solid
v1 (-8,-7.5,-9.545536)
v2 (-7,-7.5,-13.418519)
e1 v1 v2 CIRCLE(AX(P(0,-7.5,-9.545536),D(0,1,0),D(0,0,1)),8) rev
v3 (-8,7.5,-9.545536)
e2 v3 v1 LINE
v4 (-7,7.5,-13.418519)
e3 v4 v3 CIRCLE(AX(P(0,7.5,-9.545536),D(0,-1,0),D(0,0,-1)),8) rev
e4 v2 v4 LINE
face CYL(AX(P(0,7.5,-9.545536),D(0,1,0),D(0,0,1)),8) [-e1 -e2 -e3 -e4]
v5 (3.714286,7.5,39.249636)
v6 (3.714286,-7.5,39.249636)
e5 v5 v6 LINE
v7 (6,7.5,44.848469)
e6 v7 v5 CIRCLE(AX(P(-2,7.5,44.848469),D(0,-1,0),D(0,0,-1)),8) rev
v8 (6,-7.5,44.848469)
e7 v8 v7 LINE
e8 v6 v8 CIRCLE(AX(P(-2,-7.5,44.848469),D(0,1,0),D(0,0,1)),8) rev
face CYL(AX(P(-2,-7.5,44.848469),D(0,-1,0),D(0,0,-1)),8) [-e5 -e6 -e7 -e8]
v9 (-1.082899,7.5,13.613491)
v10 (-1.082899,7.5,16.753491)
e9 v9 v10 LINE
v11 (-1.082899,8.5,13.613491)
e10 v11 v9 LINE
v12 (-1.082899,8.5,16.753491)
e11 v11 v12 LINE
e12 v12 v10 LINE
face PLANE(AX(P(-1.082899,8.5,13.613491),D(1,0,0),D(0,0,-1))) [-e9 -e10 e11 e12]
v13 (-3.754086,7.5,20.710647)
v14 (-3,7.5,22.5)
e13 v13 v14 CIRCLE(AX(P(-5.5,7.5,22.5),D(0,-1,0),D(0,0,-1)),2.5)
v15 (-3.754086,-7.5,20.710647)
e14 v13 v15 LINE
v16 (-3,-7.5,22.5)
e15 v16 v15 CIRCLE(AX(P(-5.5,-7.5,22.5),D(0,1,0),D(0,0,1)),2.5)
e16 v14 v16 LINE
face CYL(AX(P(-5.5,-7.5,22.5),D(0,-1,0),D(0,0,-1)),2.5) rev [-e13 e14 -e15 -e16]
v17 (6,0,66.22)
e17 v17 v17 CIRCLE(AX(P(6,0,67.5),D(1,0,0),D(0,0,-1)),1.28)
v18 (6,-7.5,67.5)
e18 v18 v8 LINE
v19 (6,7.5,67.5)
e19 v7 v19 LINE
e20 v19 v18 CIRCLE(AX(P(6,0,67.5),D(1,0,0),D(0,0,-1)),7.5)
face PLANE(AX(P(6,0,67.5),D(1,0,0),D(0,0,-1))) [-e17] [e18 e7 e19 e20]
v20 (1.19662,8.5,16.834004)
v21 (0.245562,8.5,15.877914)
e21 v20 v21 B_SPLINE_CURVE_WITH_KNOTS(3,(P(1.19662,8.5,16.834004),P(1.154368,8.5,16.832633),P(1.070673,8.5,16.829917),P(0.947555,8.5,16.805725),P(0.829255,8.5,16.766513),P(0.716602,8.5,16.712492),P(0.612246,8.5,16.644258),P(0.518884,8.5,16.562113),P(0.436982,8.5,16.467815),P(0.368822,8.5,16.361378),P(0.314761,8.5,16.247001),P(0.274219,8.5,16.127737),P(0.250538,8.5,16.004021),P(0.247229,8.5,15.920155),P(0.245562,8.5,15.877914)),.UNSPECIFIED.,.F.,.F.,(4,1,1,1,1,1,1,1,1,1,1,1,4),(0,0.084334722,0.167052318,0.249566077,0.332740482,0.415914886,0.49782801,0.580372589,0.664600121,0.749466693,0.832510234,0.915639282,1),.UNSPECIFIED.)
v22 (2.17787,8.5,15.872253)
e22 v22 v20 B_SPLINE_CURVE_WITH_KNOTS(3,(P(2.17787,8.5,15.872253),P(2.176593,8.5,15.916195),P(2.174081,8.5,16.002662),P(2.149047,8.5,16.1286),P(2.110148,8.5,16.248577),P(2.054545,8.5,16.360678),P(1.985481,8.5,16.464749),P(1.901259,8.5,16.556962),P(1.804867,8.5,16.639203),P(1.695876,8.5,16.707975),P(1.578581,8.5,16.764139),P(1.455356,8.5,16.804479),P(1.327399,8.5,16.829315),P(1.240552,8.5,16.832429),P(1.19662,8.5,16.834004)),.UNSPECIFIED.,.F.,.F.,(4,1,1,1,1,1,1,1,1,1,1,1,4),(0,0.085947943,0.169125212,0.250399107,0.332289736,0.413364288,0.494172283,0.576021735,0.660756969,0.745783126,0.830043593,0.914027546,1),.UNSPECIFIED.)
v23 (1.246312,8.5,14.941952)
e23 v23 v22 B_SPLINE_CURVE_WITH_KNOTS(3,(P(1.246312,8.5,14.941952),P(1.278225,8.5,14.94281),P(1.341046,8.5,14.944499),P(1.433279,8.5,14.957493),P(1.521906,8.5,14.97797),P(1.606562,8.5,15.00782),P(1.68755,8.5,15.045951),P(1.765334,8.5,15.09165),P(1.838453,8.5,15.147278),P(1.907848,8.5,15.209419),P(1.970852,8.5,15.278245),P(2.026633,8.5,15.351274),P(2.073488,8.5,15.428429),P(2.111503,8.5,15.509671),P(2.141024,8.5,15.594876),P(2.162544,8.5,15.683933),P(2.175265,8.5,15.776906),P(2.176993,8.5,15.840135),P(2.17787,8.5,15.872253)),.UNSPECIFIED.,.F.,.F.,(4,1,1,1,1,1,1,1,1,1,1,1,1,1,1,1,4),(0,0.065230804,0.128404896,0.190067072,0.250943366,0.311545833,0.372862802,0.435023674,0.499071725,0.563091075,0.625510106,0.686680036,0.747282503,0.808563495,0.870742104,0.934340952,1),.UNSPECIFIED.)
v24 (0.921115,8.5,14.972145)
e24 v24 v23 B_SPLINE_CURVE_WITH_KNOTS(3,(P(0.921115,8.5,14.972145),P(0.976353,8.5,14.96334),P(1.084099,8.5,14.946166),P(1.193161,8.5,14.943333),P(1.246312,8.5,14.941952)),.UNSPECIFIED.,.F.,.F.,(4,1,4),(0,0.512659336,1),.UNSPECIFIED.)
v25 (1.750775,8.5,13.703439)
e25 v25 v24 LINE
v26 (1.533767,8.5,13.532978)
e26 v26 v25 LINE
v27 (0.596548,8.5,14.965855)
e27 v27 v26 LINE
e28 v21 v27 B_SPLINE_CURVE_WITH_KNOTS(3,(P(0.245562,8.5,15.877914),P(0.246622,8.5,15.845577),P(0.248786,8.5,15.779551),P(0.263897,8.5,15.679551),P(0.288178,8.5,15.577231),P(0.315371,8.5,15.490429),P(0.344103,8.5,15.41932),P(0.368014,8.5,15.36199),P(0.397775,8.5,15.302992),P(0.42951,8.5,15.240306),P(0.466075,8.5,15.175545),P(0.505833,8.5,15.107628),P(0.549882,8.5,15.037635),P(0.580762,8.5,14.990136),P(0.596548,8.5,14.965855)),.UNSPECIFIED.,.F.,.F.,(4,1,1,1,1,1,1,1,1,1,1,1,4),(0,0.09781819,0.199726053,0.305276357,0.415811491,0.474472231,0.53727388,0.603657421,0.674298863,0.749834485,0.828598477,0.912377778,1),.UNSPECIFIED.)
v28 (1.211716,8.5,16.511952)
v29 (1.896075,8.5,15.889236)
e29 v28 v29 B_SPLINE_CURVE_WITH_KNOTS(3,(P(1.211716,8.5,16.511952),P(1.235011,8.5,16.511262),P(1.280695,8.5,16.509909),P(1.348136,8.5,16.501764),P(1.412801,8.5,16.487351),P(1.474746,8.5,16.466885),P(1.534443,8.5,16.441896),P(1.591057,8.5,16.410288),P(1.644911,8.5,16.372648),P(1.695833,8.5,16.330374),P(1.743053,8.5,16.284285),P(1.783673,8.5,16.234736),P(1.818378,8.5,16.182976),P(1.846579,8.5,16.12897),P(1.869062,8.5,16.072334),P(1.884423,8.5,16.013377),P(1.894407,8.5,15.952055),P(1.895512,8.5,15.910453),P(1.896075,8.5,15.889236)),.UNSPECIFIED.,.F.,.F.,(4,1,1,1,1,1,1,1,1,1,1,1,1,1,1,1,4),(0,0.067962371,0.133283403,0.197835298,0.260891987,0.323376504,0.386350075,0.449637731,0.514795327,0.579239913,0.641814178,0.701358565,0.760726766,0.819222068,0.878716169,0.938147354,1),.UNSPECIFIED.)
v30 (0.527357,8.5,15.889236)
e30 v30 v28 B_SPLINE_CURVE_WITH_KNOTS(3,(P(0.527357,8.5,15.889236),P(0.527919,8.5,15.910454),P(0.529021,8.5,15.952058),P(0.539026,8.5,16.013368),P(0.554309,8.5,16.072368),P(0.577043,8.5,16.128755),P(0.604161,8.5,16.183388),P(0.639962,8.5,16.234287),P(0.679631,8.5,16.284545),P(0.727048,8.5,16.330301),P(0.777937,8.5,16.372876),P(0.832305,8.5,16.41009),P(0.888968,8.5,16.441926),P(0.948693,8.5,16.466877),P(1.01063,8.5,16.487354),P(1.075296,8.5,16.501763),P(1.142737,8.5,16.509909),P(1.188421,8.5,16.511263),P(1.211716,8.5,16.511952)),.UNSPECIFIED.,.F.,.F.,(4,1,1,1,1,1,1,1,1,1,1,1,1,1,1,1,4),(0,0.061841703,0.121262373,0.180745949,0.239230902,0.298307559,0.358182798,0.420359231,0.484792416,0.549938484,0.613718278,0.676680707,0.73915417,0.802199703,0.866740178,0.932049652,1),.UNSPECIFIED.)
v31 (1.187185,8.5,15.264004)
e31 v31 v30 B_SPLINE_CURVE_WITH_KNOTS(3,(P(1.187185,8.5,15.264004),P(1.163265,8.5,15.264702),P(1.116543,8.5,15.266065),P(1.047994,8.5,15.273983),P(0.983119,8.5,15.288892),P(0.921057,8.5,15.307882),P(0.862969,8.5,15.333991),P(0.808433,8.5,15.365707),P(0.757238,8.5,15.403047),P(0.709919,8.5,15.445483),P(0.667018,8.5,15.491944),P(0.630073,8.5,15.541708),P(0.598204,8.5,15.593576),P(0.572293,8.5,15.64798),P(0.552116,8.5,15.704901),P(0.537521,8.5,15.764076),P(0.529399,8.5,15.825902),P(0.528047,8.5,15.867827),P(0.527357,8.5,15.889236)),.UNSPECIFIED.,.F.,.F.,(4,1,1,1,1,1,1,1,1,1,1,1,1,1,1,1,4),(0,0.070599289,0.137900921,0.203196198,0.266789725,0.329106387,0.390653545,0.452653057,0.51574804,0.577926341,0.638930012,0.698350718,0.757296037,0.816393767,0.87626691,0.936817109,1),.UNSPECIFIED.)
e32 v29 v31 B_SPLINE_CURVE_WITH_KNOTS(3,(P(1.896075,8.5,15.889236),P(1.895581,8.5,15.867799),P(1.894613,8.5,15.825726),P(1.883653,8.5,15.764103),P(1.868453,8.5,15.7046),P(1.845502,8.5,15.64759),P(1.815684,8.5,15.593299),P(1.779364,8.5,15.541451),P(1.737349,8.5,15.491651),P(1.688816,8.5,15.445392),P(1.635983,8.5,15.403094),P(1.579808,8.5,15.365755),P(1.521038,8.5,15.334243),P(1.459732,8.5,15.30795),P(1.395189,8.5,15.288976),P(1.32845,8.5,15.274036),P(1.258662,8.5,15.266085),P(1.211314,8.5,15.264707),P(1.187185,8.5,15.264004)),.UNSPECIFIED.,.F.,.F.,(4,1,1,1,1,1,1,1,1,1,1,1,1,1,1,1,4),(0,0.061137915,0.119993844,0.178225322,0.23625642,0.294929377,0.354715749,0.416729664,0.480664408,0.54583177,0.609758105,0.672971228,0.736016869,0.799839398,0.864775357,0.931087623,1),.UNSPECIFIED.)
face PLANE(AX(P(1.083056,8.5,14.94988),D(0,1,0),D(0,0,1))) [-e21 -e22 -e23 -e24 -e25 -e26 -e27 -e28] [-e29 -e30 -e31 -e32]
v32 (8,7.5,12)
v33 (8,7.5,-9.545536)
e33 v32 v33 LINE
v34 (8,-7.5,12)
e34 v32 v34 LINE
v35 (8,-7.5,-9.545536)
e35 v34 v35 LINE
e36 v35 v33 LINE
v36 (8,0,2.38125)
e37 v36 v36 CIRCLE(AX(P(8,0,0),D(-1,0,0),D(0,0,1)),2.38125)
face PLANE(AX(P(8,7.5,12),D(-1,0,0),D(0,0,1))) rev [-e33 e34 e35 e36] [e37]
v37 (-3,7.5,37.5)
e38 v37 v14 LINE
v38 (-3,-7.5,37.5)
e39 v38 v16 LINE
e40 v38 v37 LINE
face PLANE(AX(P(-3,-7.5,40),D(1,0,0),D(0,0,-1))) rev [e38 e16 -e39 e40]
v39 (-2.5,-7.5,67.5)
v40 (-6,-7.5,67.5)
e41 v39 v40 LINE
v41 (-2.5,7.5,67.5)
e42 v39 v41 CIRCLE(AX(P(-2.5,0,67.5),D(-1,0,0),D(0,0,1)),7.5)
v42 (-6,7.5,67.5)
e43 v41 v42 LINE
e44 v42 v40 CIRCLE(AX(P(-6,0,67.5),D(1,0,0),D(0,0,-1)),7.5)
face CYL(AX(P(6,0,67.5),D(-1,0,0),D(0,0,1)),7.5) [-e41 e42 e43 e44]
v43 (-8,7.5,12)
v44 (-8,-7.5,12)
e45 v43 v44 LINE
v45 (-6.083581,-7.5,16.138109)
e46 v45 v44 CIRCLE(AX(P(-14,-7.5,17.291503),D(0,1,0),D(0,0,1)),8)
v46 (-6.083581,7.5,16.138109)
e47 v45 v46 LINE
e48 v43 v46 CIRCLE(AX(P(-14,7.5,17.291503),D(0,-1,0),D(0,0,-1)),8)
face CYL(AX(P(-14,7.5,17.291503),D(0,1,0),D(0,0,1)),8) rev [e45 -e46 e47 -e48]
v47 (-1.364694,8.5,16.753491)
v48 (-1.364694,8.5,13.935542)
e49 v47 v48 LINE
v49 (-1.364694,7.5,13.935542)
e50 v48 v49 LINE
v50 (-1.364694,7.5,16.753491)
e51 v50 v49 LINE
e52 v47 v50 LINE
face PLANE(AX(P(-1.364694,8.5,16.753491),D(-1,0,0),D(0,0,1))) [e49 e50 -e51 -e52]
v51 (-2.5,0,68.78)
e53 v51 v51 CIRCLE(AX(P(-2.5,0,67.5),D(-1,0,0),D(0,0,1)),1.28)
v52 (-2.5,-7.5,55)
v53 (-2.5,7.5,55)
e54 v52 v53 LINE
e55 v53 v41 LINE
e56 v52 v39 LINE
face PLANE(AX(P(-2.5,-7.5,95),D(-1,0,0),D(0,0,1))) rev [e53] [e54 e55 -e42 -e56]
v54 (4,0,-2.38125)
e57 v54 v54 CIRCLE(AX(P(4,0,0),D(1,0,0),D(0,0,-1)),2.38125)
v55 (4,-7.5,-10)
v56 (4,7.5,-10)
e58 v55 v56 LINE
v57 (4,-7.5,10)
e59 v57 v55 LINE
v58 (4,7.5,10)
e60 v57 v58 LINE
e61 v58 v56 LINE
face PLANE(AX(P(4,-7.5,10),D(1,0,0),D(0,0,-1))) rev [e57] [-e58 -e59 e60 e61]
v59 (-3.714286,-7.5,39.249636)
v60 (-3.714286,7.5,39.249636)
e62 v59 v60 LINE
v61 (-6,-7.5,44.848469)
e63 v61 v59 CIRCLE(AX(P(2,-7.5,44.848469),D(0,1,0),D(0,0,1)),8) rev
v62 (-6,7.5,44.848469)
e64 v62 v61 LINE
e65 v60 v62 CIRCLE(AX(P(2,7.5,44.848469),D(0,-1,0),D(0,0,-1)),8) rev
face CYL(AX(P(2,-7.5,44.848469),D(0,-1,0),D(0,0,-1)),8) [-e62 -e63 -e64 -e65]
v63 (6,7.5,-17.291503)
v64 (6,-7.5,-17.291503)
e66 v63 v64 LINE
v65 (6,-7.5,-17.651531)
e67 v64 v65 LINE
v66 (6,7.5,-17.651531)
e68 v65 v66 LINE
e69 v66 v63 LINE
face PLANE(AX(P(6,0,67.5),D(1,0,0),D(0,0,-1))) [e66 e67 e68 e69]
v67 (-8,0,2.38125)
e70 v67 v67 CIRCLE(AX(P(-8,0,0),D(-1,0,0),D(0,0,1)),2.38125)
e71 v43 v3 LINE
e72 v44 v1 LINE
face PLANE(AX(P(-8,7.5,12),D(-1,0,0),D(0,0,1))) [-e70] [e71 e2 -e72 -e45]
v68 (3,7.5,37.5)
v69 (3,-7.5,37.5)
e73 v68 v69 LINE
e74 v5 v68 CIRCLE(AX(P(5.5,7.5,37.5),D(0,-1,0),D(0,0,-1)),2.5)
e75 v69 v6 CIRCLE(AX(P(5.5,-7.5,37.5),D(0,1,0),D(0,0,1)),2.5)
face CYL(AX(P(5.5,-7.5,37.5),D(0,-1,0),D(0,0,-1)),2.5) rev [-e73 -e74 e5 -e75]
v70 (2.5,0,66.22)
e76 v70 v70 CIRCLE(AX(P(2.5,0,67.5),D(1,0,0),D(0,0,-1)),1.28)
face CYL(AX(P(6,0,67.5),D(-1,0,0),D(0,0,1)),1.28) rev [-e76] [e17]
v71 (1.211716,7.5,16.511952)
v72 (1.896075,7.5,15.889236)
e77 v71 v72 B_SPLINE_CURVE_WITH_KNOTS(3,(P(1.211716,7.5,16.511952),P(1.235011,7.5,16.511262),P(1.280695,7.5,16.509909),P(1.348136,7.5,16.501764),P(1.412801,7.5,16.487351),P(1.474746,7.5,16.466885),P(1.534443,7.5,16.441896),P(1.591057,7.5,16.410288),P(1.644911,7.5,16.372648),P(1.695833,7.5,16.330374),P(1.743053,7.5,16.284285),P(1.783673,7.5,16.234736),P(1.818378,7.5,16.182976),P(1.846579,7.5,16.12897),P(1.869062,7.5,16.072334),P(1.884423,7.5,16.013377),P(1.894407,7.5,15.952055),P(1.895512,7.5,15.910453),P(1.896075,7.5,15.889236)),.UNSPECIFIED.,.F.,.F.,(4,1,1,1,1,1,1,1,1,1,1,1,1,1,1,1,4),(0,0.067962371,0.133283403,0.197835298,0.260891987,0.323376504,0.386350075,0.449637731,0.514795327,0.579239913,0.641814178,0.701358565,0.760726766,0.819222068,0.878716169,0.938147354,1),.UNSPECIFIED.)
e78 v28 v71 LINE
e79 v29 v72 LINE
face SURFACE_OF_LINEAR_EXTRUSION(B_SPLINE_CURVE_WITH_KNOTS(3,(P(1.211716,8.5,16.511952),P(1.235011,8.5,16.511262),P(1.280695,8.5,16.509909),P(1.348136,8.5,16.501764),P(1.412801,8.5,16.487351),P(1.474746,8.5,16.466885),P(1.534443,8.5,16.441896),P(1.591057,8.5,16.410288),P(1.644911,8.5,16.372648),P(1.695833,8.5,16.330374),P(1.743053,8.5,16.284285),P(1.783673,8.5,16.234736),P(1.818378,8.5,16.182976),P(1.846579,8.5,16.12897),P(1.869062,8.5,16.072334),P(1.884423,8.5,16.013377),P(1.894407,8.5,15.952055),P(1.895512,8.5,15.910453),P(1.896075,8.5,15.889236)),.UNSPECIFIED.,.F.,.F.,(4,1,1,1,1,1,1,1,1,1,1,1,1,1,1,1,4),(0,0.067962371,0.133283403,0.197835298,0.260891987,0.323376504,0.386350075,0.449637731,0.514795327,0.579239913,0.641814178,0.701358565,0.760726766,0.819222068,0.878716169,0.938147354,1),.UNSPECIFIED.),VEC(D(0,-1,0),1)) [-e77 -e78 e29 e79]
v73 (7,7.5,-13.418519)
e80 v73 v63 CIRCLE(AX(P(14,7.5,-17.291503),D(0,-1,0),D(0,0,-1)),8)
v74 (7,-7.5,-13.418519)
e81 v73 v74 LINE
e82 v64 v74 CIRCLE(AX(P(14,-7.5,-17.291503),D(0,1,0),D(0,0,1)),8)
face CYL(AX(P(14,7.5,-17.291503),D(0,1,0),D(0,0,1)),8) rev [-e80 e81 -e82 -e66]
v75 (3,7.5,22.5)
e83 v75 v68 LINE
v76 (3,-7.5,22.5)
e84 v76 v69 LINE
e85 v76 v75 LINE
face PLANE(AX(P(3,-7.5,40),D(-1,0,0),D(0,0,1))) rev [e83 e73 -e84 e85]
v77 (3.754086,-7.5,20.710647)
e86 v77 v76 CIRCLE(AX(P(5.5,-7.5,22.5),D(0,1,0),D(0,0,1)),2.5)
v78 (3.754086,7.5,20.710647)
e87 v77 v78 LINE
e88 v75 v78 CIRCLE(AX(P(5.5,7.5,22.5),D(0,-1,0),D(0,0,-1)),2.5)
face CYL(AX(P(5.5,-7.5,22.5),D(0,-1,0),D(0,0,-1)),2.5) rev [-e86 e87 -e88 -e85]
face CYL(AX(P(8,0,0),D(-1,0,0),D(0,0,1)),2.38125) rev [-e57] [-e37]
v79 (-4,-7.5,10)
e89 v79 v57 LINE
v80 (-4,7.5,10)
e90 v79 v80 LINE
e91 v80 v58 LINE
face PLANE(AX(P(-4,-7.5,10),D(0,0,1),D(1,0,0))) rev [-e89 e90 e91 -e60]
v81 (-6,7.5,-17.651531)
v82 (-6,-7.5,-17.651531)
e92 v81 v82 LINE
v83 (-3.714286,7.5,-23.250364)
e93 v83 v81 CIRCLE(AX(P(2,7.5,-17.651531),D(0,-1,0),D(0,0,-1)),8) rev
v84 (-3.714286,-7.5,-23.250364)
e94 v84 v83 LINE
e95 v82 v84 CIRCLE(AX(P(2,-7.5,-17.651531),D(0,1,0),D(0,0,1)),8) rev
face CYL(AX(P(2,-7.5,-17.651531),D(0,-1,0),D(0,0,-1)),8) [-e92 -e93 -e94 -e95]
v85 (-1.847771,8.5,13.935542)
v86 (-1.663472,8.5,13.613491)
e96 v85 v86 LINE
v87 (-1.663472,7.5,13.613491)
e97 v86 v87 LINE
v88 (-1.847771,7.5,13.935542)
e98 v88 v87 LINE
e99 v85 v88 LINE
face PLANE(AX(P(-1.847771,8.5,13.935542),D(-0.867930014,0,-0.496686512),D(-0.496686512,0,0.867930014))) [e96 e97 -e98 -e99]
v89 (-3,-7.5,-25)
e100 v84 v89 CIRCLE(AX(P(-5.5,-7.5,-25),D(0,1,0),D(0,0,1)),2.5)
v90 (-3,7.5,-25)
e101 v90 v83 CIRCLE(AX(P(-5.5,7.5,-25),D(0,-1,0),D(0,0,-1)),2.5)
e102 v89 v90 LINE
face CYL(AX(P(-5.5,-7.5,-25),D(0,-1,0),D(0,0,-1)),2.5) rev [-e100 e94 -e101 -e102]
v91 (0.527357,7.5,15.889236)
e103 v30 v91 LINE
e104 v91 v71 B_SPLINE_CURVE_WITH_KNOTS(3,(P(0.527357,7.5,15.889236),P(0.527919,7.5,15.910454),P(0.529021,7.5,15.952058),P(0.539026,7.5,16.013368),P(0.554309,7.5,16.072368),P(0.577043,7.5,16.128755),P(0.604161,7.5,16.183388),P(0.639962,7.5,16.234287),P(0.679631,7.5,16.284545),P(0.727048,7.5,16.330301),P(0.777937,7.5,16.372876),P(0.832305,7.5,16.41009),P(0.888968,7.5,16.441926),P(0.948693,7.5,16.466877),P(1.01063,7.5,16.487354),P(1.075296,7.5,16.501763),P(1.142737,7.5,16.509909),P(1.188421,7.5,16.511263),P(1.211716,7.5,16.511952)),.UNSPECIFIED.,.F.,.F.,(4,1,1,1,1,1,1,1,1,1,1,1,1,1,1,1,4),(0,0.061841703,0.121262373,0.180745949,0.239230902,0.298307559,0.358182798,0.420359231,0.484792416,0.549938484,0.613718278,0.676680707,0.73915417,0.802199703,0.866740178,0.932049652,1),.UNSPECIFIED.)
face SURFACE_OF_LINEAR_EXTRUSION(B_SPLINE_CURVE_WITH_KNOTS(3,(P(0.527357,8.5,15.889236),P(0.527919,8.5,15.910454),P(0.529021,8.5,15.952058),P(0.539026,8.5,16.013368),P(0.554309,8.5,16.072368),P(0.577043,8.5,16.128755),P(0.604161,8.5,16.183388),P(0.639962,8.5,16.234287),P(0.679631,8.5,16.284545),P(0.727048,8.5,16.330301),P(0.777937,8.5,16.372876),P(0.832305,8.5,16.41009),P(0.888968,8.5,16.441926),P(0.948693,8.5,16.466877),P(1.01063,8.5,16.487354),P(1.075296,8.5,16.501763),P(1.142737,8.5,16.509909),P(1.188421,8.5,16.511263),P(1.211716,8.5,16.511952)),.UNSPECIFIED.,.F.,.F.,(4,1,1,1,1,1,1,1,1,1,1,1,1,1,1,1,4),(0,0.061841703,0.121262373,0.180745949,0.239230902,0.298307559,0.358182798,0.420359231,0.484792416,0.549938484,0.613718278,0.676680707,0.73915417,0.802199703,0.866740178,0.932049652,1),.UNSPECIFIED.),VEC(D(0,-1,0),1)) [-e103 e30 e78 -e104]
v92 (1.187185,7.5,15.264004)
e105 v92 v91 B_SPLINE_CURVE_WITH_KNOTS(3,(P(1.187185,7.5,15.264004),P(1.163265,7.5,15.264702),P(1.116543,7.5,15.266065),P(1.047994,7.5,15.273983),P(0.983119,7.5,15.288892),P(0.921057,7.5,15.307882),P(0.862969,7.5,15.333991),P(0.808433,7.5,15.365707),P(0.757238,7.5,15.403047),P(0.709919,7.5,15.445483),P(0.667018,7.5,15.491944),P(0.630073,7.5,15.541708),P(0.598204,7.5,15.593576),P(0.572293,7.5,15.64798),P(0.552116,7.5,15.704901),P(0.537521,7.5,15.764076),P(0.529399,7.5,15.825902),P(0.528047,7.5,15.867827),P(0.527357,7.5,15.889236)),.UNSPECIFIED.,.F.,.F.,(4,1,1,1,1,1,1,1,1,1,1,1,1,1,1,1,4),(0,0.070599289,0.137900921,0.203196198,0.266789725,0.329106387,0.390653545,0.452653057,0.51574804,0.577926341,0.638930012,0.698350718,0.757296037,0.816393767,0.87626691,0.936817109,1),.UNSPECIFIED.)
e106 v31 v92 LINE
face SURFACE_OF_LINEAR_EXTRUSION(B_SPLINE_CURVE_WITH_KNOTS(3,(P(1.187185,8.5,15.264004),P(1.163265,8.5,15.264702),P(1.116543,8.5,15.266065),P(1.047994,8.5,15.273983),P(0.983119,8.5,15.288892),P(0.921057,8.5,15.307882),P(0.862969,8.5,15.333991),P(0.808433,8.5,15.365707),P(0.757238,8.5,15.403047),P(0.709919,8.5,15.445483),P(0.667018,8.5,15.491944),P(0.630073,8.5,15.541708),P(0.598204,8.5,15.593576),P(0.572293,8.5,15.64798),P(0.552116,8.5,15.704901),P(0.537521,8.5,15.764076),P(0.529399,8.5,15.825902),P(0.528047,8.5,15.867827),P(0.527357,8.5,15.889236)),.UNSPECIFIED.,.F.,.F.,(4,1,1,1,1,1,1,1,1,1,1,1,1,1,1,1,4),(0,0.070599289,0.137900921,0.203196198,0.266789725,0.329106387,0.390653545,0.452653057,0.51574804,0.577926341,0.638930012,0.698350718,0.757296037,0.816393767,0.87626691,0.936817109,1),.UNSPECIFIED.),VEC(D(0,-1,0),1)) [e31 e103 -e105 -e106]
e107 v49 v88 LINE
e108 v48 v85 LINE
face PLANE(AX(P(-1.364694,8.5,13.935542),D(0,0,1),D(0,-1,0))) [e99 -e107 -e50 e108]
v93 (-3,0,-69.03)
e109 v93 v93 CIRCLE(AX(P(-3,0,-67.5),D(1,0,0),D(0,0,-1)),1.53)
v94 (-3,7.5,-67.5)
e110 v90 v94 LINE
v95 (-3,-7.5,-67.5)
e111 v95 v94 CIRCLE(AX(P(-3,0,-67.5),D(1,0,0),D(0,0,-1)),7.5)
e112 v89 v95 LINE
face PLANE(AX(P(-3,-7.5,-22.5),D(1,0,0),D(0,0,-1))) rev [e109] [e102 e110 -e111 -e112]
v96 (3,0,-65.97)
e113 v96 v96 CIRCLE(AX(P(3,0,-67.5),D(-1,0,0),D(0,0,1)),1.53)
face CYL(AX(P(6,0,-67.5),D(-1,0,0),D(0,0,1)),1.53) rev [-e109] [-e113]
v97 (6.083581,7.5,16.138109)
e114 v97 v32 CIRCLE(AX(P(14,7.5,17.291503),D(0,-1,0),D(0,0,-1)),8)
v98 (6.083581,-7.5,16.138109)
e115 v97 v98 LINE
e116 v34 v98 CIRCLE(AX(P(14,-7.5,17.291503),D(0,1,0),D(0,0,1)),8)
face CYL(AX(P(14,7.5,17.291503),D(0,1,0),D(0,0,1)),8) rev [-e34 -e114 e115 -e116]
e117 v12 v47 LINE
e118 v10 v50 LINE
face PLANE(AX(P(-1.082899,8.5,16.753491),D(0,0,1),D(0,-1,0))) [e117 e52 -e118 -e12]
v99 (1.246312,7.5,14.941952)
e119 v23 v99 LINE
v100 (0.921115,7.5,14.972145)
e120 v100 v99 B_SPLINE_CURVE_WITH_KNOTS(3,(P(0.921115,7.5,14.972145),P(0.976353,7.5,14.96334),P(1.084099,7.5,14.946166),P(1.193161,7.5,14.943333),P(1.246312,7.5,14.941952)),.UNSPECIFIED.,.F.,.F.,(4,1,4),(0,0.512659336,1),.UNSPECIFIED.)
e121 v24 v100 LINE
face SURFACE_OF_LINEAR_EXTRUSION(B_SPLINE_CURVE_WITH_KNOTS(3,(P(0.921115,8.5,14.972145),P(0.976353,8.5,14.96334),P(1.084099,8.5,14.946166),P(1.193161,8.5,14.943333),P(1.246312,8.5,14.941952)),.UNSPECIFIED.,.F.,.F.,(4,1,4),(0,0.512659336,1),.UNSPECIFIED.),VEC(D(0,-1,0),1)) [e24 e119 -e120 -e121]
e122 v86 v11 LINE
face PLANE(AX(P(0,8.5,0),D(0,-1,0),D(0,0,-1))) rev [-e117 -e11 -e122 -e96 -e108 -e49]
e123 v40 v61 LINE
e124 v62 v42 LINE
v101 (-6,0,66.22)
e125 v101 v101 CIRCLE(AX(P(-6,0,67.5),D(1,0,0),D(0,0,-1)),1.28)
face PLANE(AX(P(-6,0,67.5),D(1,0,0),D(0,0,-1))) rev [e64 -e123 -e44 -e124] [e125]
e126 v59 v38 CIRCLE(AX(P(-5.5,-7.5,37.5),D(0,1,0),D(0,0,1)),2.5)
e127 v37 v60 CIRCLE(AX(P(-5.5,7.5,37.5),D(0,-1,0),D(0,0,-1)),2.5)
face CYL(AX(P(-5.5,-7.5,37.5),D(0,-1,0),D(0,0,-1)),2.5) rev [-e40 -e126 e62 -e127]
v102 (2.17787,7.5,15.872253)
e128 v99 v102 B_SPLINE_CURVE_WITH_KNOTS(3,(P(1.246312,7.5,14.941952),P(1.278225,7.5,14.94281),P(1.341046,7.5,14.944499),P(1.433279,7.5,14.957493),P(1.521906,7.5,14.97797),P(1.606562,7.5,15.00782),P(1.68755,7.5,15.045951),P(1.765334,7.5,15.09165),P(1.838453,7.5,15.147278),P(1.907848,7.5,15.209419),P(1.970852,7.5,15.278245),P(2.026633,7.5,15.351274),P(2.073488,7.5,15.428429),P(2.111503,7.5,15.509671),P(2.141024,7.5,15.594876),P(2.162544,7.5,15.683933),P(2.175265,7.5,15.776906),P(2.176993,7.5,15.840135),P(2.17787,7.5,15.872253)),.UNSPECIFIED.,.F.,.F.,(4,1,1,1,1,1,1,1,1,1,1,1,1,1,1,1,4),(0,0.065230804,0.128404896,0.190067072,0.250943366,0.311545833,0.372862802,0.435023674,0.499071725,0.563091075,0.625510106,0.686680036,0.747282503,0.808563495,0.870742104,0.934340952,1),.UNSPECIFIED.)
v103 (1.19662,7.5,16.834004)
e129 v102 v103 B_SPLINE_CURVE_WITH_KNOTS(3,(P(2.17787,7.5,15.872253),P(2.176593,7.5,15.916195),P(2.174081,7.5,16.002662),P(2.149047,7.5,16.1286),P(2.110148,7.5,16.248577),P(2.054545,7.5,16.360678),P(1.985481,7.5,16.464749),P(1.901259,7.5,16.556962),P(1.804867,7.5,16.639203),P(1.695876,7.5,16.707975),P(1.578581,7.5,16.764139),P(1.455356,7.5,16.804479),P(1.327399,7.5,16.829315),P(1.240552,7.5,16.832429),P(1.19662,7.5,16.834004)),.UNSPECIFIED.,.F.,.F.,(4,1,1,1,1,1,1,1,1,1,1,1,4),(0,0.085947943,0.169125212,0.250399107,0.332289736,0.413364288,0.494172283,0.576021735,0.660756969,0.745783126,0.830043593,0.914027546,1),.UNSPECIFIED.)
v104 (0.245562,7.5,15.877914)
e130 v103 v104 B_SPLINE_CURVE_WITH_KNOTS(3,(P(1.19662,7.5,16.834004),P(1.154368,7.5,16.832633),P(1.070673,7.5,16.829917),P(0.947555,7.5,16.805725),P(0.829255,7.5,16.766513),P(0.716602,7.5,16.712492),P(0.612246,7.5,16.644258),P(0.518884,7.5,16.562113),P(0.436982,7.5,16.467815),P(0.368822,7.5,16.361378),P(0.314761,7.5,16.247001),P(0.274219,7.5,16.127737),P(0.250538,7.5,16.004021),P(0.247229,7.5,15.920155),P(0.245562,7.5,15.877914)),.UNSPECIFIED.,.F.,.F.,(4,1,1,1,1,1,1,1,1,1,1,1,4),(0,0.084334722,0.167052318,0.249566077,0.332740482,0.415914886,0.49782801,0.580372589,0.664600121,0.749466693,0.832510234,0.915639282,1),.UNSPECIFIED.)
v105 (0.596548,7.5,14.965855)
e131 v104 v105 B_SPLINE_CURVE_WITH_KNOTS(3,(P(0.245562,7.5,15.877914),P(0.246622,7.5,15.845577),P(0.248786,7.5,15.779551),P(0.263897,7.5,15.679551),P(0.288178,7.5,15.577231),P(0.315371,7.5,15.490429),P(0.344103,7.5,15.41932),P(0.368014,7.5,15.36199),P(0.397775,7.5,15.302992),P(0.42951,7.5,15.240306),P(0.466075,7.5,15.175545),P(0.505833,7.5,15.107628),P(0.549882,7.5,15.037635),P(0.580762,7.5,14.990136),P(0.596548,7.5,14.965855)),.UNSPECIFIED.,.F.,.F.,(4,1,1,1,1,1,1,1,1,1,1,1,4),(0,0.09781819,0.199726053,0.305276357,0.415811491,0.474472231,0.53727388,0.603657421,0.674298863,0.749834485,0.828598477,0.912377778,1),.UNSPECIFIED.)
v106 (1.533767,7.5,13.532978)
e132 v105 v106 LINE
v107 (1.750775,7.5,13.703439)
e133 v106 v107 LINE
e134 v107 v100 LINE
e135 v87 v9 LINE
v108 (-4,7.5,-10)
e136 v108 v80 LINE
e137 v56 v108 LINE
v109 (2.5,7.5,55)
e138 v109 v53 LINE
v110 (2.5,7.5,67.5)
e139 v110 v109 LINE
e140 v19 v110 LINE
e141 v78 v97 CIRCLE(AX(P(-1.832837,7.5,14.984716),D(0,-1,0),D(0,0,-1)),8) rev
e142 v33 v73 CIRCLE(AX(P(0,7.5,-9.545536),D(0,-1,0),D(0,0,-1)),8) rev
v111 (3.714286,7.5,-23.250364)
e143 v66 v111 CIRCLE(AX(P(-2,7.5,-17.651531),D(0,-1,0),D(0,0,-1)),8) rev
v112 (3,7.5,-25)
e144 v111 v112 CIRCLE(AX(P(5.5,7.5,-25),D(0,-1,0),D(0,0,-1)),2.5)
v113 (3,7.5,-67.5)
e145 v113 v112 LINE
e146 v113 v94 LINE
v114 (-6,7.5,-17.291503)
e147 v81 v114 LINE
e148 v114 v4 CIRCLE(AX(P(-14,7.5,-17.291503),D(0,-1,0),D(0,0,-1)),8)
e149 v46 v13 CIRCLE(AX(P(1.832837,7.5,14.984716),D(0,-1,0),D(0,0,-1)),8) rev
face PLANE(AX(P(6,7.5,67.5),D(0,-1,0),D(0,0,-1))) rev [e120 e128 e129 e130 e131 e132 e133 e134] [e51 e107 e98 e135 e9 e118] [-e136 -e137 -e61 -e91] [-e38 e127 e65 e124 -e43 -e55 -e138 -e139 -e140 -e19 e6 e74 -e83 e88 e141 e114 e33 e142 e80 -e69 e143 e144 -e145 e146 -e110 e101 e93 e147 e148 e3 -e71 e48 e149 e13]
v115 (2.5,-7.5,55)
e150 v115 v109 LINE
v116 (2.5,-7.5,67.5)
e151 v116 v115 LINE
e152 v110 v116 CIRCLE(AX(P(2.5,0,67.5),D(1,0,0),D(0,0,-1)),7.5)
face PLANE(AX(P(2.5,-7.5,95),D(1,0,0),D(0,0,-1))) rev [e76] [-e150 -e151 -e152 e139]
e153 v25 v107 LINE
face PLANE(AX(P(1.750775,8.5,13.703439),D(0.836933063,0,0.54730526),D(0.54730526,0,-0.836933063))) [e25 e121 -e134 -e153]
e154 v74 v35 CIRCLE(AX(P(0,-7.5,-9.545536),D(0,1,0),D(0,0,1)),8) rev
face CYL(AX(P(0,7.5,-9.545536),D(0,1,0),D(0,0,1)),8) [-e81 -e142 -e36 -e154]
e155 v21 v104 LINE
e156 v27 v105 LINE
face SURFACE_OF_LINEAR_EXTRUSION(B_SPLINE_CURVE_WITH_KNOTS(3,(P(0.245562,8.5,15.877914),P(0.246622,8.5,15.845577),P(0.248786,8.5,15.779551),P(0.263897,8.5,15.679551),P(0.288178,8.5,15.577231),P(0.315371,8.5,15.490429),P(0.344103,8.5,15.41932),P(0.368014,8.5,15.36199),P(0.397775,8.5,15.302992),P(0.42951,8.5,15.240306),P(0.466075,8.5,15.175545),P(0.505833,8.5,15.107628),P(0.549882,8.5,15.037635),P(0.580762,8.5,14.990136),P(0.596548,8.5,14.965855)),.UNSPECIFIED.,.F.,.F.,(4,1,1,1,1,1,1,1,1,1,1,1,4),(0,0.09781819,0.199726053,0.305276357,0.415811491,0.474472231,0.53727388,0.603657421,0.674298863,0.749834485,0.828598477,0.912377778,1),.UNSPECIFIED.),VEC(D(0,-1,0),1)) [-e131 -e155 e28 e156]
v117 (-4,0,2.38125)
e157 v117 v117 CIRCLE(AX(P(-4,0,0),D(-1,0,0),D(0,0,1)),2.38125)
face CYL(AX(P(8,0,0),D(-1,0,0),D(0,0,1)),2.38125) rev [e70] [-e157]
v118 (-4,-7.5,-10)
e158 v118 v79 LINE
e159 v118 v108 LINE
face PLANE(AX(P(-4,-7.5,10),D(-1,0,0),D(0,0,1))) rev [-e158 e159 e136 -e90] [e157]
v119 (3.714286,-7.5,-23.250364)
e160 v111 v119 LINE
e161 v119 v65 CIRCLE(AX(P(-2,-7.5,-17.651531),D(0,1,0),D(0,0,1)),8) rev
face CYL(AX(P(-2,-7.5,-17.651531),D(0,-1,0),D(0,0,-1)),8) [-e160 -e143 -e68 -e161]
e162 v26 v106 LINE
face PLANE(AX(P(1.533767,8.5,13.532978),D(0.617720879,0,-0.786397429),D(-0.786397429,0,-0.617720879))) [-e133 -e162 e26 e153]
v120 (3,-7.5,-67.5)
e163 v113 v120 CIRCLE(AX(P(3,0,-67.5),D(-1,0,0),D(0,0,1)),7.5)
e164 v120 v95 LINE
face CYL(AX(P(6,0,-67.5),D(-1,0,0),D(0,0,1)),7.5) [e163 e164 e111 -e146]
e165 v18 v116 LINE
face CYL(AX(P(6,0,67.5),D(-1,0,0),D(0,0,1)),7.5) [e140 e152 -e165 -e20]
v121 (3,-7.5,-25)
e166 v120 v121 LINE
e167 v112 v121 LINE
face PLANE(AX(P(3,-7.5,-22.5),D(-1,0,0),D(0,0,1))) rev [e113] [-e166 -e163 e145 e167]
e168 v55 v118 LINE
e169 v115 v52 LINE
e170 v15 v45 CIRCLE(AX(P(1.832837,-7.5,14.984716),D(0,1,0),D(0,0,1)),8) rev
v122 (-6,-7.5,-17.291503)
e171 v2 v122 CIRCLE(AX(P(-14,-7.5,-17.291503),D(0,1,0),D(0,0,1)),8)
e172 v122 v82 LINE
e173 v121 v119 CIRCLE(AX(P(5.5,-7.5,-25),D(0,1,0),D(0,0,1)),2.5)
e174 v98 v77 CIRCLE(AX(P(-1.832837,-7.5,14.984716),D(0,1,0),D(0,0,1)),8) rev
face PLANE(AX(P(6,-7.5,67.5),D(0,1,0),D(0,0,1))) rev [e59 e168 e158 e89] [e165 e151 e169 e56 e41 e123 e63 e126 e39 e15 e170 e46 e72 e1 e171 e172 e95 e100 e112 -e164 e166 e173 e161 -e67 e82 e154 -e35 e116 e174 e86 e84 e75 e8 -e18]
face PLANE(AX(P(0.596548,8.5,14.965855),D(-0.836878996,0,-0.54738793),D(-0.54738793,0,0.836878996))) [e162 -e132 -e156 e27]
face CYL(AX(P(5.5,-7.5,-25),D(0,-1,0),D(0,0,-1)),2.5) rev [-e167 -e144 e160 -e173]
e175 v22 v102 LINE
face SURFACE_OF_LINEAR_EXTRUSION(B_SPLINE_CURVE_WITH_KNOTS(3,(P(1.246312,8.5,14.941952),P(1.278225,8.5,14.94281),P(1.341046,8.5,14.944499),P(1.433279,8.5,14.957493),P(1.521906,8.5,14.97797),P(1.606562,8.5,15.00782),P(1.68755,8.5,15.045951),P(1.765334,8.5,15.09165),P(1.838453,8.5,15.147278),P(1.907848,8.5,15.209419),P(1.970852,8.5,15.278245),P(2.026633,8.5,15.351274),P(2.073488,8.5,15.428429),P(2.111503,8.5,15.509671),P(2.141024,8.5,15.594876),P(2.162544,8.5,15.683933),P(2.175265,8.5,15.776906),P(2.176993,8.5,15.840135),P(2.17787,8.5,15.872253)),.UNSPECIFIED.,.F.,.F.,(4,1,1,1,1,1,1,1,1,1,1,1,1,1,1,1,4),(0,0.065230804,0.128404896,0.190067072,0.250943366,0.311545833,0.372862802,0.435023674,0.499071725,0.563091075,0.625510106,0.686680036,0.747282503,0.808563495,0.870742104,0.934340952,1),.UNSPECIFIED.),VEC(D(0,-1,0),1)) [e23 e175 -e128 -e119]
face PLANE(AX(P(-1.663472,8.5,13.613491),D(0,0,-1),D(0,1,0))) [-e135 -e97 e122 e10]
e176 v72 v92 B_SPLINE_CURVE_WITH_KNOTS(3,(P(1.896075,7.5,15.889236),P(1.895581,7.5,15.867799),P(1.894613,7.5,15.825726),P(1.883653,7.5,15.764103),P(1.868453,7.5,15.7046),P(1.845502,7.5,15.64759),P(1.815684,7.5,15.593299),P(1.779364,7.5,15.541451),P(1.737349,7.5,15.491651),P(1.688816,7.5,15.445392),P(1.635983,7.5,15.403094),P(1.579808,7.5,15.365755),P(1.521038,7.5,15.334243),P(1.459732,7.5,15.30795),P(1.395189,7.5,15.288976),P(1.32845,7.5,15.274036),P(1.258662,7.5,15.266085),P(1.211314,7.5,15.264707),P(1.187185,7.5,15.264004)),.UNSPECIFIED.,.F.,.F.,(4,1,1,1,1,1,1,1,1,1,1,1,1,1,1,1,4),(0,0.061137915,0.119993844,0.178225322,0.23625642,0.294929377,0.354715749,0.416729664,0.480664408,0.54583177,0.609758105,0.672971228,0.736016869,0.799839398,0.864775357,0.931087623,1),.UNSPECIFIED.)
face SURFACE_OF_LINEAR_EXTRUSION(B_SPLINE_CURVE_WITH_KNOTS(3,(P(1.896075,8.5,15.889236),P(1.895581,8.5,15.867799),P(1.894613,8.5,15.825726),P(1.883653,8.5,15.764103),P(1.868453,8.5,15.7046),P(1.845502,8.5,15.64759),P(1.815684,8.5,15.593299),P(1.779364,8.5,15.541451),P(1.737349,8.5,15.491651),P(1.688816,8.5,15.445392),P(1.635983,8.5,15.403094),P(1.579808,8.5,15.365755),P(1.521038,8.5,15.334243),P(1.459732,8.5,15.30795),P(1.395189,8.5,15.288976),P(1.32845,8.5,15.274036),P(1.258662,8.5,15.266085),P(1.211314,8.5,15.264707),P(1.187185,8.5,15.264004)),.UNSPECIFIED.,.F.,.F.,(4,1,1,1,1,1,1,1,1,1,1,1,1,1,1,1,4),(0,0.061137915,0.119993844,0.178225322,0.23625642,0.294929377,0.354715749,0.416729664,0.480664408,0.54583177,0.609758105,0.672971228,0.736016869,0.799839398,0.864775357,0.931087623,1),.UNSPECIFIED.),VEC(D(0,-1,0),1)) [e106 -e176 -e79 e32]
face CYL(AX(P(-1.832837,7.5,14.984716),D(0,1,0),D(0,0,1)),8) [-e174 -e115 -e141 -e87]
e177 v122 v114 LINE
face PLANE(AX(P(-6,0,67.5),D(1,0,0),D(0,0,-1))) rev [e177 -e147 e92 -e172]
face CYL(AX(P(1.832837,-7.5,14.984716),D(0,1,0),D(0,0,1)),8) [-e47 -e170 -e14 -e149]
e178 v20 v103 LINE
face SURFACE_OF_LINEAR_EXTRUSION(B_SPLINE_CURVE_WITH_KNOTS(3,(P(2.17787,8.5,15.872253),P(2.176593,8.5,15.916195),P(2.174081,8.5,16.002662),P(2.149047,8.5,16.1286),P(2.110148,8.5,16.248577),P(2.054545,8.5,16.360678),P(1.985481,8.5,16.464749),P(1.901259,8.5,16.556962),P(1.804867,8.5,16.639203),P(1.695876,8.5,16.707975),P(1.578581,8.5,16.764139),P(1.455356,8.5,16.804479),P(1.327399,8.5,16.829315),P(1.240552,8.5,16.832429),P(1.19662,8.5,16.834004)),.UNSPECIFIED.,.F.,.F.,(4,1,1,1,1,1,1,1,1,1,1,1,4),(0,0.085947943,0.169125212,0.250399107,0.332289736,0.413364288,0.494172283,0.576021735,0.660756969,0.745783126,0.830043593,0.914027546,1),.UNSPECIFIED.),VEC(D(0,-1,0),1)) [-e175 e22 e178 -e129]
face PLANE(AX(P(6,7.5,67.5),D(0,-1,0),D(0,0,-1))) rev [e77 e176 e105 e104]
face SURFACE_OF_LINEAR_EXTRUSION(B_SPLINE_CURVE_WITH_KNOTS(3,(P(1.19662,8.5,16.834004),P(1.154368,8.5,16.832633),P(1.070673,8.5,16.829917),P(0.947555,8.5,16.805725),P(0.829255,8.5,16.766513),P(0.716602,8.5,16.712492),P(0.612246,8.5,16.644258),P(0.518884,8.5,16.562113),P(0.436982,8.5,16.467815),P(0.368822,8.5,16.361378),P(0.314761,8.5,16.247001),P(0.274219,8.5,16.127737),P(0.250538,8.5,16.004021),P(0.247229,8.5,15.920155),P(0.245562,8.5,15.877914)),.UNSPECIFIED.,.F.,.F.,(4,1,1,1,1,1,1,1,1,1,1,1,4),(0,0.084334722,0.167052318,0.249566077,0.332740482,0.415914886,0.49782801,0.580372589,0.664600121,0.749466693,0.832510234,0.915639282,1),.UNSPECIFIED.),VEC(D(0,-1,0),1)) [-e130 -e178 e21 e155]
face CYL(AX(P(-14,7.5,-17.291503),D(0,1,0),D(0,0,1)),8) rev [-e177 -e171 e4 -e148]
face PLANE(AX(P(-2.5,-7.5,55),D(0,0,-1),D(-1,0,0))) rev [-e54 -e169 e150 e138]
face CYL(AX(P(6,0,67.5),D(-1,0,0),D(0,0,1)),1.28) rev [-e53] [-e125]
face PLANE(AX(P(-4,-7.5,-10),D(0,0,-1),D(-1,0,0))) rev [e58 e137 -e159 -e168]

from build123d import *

# Parameters (mm, degrees)
SKETCH1_R           = 1.28
SKETCH1_R_2         = 2.38125
SKETCH1_R_3         = 1.53
BASE_DEPTH          = 6
ALL_CUTS_DEPTH      = 76.612498967
ALL_CUTS_DEPTH_BACK = 76.612498967
SKETCH2_W           = 5
SKETCH2_H           = 40
SKETCH2_W_2         = 6
SKETCH2_H_2         = 20
SKETCH2_H_3         = 52.5
SKETCH2_W_3         = 8
SKETCH3_W           = 16
SKETCH3_H           = 24
SKETCH3_W_2         = 8
SKETCH3_H_2         = 20
BOSS_EXTRUDE1_DEPTH = 15
SKETCH4_R           = 2.38125
CUT_EXTRUDE1_DEPTH  = 78.053552806
FILLET1_R           = 2.5
FILLET2_R           = 8
FILLET3_R           = 8
BOSS_EXTRUDE2_DEPTH = 1


with BuildPart() as part:
    # Sketch1 → BASE (new, symmetric)
    with BuildSketch(Plane(origin=(0, 0, 0), x_dir=(0, 0, -1), z_dir=(1, 0, 0))):
        with BuildLine():
            Line((-67.5, 7.5), (67.5, 7.5))
            ThreePointArc((67.5, 7.5), (75, 0), (67.5, -7.5))
            Line((67.5, -7.5), (-67.5, -7.5))
            ThreePointArc((-67.5, -7.5), (-75, 0), (-67.5, 7.5))
        make_face()
        with Locations((-67.5, 0)):
            Circle(SKETCH1_R, mode=Mode.SUBTRACT)
        Circle(SKETCH1_R_2, mode=Mode.SUBTRACT)
        with Locations((67.5, 0)):
            Circle(SKETCH1_R_3, mode=Mode.SUBTRACT)
    extrude(amount=BASE_DEPTH, both=True)

    # Sketch2 → All_Cuts (cut, two sides: drawn at the far end of the back side and taken through both)
    with BuildSketch(Plane(origin=(0, 0, 0), x_dir=(1, 0, 0), z_dir=(0, 1, 0)).offset(-ALL_CUTS_DEPTH_BACK)):
        with Locations((0, -75)):
            Rectangle(SKETCH2_W, SKETCH2_H)
        with Locations((-6, -30)):
            Rectangle(SKETCH2_W_2, SKETCH2_H_2)
        with Locations((6, -30)):
            Rectangle(SKETCH2_W_2, SKETCH2_H_2)
        with Locations((6, 48.75)):
            Rectangle(SKETCH2_W_2, SKETCH2_H_3)
        with Locations((-6, 48.75)):
            Rectangle(SKETCH2_W_2, SKETCH2_H_3)
        Rectangle(SKETCH2_W_3, SKETCH2_H_2)
    extrude(amount=ALL_CUTS_DEPTH + ALL_CUTS_DEPTH_BACK, mode=Mode.SUBTRACT)

    # Sketch3 → Boss-Extrude1 (add, through all)
    with BuildSketch(Plane.XZ.offset(7.5)):
        Rectangle(SKETCH3_W, SKETCH3_H)
        Rectangle(SKETCH3_W_2, SKETCH3_H_2, mode=Mode.SUBTRACT)
    extrude(amount=-BOSS_EXTRUDE1_DEPTH)

    # Sketch4 → Cut-Extrude1 (cut, through all)
    with BuildSketch(Plane.ZY.offset(8)):
        Circle(SKETCH4_R)
    extrude(amount=-CUT_EXTRUDE1_DEPTH, mode=Mode.SUBTRACT)

    # Fillet1
    fillet1_edges = [part.edges().sort_by_distance(p)[0] for p in [
        (3, 0, 20),
        (3, 0, 40),
        (-3, 0, 40),
        (-3, 0, 20),
        (3, 0, -22.5),
        (-3, 0, -22.5),
    ]]
    fillet(fillet1_edges, radius=FILLET1_R)

    # Fillet2
    # the kernel refuses this fillet: 8 mm, written as the material it adds along each edge
    with BuildSketch(Plane(origin=(-6, -7.5, -12), x_dir=(0, 0, -1), z_dir=(0, 1, 0))) as fillet2_piece_1:
        with BuildLine():
            CenterArc((5.291502622, 8), FILLET2_R, 228.590377891, 41.409622109)
            Line((0, 2), (-0.105830052, 1.88))
            ThreePointArc((-0.105830052, 1.88), (-0.16, 1), (-0.16, 0))
            Line((-0.16, 0), (0, -0.16))
            Line((0, -0.16), (5.291502622, -0.16))
            Line((5.291502622, -0.16), (5.291502622, 0))
        make_face()
    extrude(amount=15)
    with BuildSketch(Plane(origin=(6, -7.5, -12), x_dir=(1, 0, 0), z_dir=(0, 1, 0))) as fillet2_piece_2:
        with BuildLine():
            CenterArc((8, 5.291502622), FILLET2_R, 180, 41.409622109)
            Line((0, 5.291502622), (-0.16, 5.291502622))
            Line((-0.16, 5.291502622), (-0.16, 0))
            Line((-0.16, 0), (0, -0.16))
            ThreePointArc((0, -0.16), (1, -0.16), (1.88, -0.105830052))
            Line((1.88, -0.105830052), (2, 0))
        make_face()
    extrude(amount=15)
    with BuildSketch(Plane(origin=(6, 7.5, 12), x_dir=(0, 0, 1), z_dir=(0, -1, 0))) as fillet2_piece_3:
        with BuildLine():
            CenterArc((5.291502622, -8), FILLET2_R, 90, 41.409622109)
            Line((0, -2), (-0.105830052, -1.88))
            ThreePointArc((-0.105830052, -1.88), (-0.16, -1), (-0.16, 0))
            Line((-0.16, 0), (0, 0.16))
            Line((0, 0.16), (5.291502622, 0.16))
            Line((5.291502622, 0.16), (5.291502622, 0))
        make_face()
    extrude(amount=15)
    with BuildSketch(Plane(origin=(-6, 7.5, 12), x_dir=(-1, 0, 0), z_dir=(0, -1, 0))) as fillet2_piece_4:
        with BuildLine():
            CenterArc((8, -5.291502622), FILLET2_R, 138.590377891, 41.409622109)
            Line((0, -5.291502622), (-0.16, -5.291502622))
            Line((-0.16, -5.291502622), (-0.16, 0))
            Line((-0.16, 0), (0, 0.16))
            ThreePointArc((0, 0.16), (1, 0.16), (1.88, 0.105830052))
            Line((1.88, 0.105830052), (2, 0))
        make_face()
    extrude(amount=15)

    # Fillet3
    fillet3_edges = [part.edges().sort_by_distance(p)[0] for p in [
        (8, 0, -12),
        (-8, 0, -12),
        (-6, 0, 20),
        (6, 0, 20),
        (-6, 0, -22.5),
        (6, 0, -22.5),
        (6, 0, 40),
        (-6, 0, 40),
    ]]
    fillet(fillet3_edges, radius=FILLET3_R)

    # Sketch5 → Boss-Extrude2 (add)
    # profile 1 of 2: a face of its own
    with BuildSketch(Plane(origin=(0, 7.5, 0), x_dir=(1, 0, 0), z_dir=(0, 1, 0))):
        Polygon((-1.663472098, -13.613490945), (-1.082899181, -13.613490945), (-1.082899181, -16.753490945), (-1.364694053, -16.753490945), (-1.364694053, -13.935542228), (-1.847770976, -13.935542228), align=None)
    # profile 2 of 2: a face of its own
    with BuildSketch(Plane(origin=(0, 7.5, 0), x_dir=(1, 0, 0), z_dir=(0, 1, 0))):
        with BuildLine():
            Line((1.533767485, -13.532978125), (1.750774697, -13.703438862))
            Line((1.750774697, -13.703438862), (0.921115242, -14.972144792))
            add(Edge.make_bspline(
                [(0.921115242, -14.972144792), (0.976352576, -14.963340357), (1.084099242, -14.946166311), (1.193161219, -14.943333183), (1.246311556, -14.941952484)],
                knots=[0, 0, 0, 0, 1.025318673, 2, 2, 2, 2], degree=3))
            add(Edge.make_bspline(
                [(1.246311556, -14.941952484), (1.278225167, -14.942810253), (1.341046161, -14.944498745), (1.433278549, -14.957492828), (1.521906337, -14.977970214), (1.606562183, -15.007820181), (1.687549944, -15.045950865), (1.76533438, -15.091650308), (1.838453326, -15.147278262), (1.907848384, -15.209418822), (1.970852123, -15.278244917), (2.026632927, -15.351273544), (2.07348782, -15.42842862), (2.111503281, -15.509671066), (2.141023658, -15.594875647), (2.162544002, -15.68393335), (2.175265123, -15.776905584), (2.176992563, -15.840134576), (2.17787005, -15.872252965)],
                knots=[0, 0, 0, 0, 1.04369286, 2.054478336, 3.041073146, 4.015093852, 4.984733326, 5.965804835, 6.960378782, 7.985147595, 9.009457201, 10.008161701, 10.986880575, 11.956520048, 12.937015923, 13.931873656, 14.949455224, 16, 16, 16, 16], degree=3))
            add(Edge.make_bspline(
                [(2.17787005, -15.872252965), (2.176593321, -15.916194756), (2.174081022, -16.002661803), (2.149047331, -16.128599762), (2.110147535, -16.248576933), (2.054544838, -16.360677779), (1.985480643, -16.464748655), (1.901259031, -16.556961901), (1.804866873, -16.639203021), (1.69587586, -16.707974959), (1.578580744, -16.764138839), (1.45535638, -16.804479085), (1.327399455, -16.829315112), (1.240551892, -16.832428738), (1.19662005, -16.834003766)],
                knots=[0, 0, 0, 0, 1.031375318, 2.029502543, 3.004789286, 3.987476834, 4.960371455, 5.9300674, 6.912260825, 7.929083631, 8.949397511, 9.960523116, 10.96833055, 12, 12, 12, 12], degree=3))
            add(Edge.make_bspline(
                [(1.19662005, -16.834003766), (1.154367581, -16.832632747), (1.070672839, -16.829916999), (0.947555417, -16.8057247), (0.829255453, -16.766513185), (0.71660178, -16.712492375), (0.612245573, -16.644257589), (0.518883831, -16.562113144), (0.436982067, -16.467814938), (0.368821979, -16.361377598), (0.314761288, -16.247000893), (0.274219469, -16.127737273), (0.250538268, -16.00402129), (0.247229106, -15.920155353), (0.245562357, -15.877914022)],
                knots=[0, 0, 0, 0, 1.012016664, 2.004627821, 2.994792927, 3.992885782, 4.990978636, 5.973936114, 6.964471063, 7.975201453, 8.993600317, 9.990122807, 10.98767138, 12, 12, 12, 12], degree=3))
            add(Edge.make_bspline(
                [(0.245562357, -15.877914022), (0.246622282, -15.845576882), (0.248786446, -15.77955062), (0.263897374, -15.679551463), (0.288178361, -15.57723135), (0.315370982, -15.490429016), (0.344102529, -15.419320108), (0.368013665, -15.361989548), (0.397775479, -15.302992471), (0.429510455, -15.240305837), (0.466075189, -15.175545192), (0.505832657, -15.107628186), (0.549882058, -15.037634959), (0.580761861, -14.990136453), (0.596547934, -14.965854728)],
                knots=[0, 0, 0, 0, 1.173818275, 2.396712641, 3.66331629, 4.989737886, 5.693666774, 6.447286557, 7.243889047, 8.091586357, 8.998013824, 9.943181721, 10.948533338, 12, 12, 12, 12], degree=3))
            Line((0.596547934, -14.965854728), (1.533767485, -13.532978125))
        make_face()
        with BuildLine():
            add(Edge.make_bspline(
                [(1.187184953, -15.264003766), (1.163265111, -15.264701782), (1.11654271, -15.266065211), (1.047994344, -15.273982723), (0.983119027, -15.288892399), (0.921057255, -15.307881622), (0.862969316, -15.333991224), (0.808433043, -15.365706838), (0.757237539, -15.403046981), (0.709919038, -15.445482655), (0.667017969, -15.491943919), (0.630072611, -15.541708005), (0.598203944, -15.593575604), (0.572292826, -15.64798009), (0.552116016, -15.704900664), (0.537521071, -15.764075533), (0.529398562, -15.82590151), (0.528047257, -15.867827242), (0.527357229, -15.889236138)],
                knots=[0, 0, 0, 0, 1.129588631, 2.206414736, 3.251139165, 4.268635594, 5.265702196, 6.250456724, 7.242448911, 8.251968645, 9.246821453, 10.222880186, 11.173611482, 12.116736599, 13.062300278, 14.020270554, 14.989073742, 16, 16, 16, 16], degree=3))
            add(Edge.make_bspline(
                [(0.527357229, -15.889236138), (0.527919165, -15.910453548), (0.529021037, -15.952057732), (0.539026261, -16.013367738), (0.554309164, -16.072368256), (0.577043119, -16.128755119), (0.604160956, -16.183387816), (0.639961732, -16.234287472), (0.679630506, -16.284545478), (0.727048035, -16.330301084), (0.777936995, -16.372876455), (0.83230493, -16.410090168), (0.888968437, -16.441926335), (0.948692513, -16.466876863), (1.010629806, -16.487353509), (1.07529636, -16.50176295), (1.142737151, -16.509909479), (1.188421404, -16.511262544), (1.211716203, -16.511952484)],
                knots=[0, 0, 0, 0, 0.989467248, 1.94019797, 2.891935182, 3.827694429, 4.772920941, 5.730924762, 6.725747692, 7.756678648, 8.79901574, 9.819492441, 10.826891316, 11.826466727, 12.835195252, 13.867842842, 14.912794438, 16, 16, 16, 16], degree=3))
            add(Edge.make_bspline(
                [(1.211716203, -16.511952484), (1.235010965, -16.51126249), (1.280695143, -16.509909319), (1.348136476, -16.501763559), (1.412801025, -16.487351275), (1.474745607, -16.466884961), (1.534442776, -16.441896294), (1.591056726, -16.410288229), (1.644910502, -16.372647597), (1.695832868, -16.330373842), (1.74305303, -16.284285055), (1.783673217, -16.234736104), (1.818377604, -16.182976438), (1.84657856, -16.128970331), (1.869062119, -16.072334162), (1.884422521, -16.013376872), (1.894407083, -15.95205534), (1.895511794, -15.910452741), (1.896075178, -15.889236138)],
                knots=[0, 0, 0, 0, 1.087397944, 2.132534446, 3.165364764, 4.174271784, 5.174024072, 6.181601208, 7.194203697, 8.236725232, 9.267838612, 10.269026844, 11.221737037, 12.171628256, 13.107553087, 14.05945871, 15.010357665, 16, 16, 16, 16], degree=3))
            add(Edge.make_bspline(
                [(1.896075178, -15.889236138), (1.895581486, -15.867799312), (1.894612531, -15.825725795), (1.88365308, -15.764103189), (1.86845335, -15.704600004), (1.845501717, -15.64759021), (1.815683788, -15.593298778), (1.779364389, -15.541451456), (1.737348883, -15.491650744), (1.688815661, -15.445391539), (1.635982709, -15.403093875), (1.579807583, -15.365755187), (1.521037573, -15.334243065), (1.459732264, -15.307950408), (1.395189221, -15.288976308), (1.32845046, -15.27403597), (1.258662396, -15.266085474), (1.211314239, -15.264706507), (1.187184953, -15.264003766)],
                knots=[0, 0, 0, 0, 0.978206639, 1.919901502, 2.851605144, 3.780102724, 4.718870031, 5.675451981, 6.667674623, 7.690630536, 8.733308323, 9.756129687, 10.767539656, 11.776269907, 12.797430371, 13.836405707, 14.897401972, 16, 16, 16, 16], degree=3))
        make_face(mode=Mode.SUBTRACT)
    extrude(amount=BOSS_EXTRUDE2_DEPTH)


solid = part.part
